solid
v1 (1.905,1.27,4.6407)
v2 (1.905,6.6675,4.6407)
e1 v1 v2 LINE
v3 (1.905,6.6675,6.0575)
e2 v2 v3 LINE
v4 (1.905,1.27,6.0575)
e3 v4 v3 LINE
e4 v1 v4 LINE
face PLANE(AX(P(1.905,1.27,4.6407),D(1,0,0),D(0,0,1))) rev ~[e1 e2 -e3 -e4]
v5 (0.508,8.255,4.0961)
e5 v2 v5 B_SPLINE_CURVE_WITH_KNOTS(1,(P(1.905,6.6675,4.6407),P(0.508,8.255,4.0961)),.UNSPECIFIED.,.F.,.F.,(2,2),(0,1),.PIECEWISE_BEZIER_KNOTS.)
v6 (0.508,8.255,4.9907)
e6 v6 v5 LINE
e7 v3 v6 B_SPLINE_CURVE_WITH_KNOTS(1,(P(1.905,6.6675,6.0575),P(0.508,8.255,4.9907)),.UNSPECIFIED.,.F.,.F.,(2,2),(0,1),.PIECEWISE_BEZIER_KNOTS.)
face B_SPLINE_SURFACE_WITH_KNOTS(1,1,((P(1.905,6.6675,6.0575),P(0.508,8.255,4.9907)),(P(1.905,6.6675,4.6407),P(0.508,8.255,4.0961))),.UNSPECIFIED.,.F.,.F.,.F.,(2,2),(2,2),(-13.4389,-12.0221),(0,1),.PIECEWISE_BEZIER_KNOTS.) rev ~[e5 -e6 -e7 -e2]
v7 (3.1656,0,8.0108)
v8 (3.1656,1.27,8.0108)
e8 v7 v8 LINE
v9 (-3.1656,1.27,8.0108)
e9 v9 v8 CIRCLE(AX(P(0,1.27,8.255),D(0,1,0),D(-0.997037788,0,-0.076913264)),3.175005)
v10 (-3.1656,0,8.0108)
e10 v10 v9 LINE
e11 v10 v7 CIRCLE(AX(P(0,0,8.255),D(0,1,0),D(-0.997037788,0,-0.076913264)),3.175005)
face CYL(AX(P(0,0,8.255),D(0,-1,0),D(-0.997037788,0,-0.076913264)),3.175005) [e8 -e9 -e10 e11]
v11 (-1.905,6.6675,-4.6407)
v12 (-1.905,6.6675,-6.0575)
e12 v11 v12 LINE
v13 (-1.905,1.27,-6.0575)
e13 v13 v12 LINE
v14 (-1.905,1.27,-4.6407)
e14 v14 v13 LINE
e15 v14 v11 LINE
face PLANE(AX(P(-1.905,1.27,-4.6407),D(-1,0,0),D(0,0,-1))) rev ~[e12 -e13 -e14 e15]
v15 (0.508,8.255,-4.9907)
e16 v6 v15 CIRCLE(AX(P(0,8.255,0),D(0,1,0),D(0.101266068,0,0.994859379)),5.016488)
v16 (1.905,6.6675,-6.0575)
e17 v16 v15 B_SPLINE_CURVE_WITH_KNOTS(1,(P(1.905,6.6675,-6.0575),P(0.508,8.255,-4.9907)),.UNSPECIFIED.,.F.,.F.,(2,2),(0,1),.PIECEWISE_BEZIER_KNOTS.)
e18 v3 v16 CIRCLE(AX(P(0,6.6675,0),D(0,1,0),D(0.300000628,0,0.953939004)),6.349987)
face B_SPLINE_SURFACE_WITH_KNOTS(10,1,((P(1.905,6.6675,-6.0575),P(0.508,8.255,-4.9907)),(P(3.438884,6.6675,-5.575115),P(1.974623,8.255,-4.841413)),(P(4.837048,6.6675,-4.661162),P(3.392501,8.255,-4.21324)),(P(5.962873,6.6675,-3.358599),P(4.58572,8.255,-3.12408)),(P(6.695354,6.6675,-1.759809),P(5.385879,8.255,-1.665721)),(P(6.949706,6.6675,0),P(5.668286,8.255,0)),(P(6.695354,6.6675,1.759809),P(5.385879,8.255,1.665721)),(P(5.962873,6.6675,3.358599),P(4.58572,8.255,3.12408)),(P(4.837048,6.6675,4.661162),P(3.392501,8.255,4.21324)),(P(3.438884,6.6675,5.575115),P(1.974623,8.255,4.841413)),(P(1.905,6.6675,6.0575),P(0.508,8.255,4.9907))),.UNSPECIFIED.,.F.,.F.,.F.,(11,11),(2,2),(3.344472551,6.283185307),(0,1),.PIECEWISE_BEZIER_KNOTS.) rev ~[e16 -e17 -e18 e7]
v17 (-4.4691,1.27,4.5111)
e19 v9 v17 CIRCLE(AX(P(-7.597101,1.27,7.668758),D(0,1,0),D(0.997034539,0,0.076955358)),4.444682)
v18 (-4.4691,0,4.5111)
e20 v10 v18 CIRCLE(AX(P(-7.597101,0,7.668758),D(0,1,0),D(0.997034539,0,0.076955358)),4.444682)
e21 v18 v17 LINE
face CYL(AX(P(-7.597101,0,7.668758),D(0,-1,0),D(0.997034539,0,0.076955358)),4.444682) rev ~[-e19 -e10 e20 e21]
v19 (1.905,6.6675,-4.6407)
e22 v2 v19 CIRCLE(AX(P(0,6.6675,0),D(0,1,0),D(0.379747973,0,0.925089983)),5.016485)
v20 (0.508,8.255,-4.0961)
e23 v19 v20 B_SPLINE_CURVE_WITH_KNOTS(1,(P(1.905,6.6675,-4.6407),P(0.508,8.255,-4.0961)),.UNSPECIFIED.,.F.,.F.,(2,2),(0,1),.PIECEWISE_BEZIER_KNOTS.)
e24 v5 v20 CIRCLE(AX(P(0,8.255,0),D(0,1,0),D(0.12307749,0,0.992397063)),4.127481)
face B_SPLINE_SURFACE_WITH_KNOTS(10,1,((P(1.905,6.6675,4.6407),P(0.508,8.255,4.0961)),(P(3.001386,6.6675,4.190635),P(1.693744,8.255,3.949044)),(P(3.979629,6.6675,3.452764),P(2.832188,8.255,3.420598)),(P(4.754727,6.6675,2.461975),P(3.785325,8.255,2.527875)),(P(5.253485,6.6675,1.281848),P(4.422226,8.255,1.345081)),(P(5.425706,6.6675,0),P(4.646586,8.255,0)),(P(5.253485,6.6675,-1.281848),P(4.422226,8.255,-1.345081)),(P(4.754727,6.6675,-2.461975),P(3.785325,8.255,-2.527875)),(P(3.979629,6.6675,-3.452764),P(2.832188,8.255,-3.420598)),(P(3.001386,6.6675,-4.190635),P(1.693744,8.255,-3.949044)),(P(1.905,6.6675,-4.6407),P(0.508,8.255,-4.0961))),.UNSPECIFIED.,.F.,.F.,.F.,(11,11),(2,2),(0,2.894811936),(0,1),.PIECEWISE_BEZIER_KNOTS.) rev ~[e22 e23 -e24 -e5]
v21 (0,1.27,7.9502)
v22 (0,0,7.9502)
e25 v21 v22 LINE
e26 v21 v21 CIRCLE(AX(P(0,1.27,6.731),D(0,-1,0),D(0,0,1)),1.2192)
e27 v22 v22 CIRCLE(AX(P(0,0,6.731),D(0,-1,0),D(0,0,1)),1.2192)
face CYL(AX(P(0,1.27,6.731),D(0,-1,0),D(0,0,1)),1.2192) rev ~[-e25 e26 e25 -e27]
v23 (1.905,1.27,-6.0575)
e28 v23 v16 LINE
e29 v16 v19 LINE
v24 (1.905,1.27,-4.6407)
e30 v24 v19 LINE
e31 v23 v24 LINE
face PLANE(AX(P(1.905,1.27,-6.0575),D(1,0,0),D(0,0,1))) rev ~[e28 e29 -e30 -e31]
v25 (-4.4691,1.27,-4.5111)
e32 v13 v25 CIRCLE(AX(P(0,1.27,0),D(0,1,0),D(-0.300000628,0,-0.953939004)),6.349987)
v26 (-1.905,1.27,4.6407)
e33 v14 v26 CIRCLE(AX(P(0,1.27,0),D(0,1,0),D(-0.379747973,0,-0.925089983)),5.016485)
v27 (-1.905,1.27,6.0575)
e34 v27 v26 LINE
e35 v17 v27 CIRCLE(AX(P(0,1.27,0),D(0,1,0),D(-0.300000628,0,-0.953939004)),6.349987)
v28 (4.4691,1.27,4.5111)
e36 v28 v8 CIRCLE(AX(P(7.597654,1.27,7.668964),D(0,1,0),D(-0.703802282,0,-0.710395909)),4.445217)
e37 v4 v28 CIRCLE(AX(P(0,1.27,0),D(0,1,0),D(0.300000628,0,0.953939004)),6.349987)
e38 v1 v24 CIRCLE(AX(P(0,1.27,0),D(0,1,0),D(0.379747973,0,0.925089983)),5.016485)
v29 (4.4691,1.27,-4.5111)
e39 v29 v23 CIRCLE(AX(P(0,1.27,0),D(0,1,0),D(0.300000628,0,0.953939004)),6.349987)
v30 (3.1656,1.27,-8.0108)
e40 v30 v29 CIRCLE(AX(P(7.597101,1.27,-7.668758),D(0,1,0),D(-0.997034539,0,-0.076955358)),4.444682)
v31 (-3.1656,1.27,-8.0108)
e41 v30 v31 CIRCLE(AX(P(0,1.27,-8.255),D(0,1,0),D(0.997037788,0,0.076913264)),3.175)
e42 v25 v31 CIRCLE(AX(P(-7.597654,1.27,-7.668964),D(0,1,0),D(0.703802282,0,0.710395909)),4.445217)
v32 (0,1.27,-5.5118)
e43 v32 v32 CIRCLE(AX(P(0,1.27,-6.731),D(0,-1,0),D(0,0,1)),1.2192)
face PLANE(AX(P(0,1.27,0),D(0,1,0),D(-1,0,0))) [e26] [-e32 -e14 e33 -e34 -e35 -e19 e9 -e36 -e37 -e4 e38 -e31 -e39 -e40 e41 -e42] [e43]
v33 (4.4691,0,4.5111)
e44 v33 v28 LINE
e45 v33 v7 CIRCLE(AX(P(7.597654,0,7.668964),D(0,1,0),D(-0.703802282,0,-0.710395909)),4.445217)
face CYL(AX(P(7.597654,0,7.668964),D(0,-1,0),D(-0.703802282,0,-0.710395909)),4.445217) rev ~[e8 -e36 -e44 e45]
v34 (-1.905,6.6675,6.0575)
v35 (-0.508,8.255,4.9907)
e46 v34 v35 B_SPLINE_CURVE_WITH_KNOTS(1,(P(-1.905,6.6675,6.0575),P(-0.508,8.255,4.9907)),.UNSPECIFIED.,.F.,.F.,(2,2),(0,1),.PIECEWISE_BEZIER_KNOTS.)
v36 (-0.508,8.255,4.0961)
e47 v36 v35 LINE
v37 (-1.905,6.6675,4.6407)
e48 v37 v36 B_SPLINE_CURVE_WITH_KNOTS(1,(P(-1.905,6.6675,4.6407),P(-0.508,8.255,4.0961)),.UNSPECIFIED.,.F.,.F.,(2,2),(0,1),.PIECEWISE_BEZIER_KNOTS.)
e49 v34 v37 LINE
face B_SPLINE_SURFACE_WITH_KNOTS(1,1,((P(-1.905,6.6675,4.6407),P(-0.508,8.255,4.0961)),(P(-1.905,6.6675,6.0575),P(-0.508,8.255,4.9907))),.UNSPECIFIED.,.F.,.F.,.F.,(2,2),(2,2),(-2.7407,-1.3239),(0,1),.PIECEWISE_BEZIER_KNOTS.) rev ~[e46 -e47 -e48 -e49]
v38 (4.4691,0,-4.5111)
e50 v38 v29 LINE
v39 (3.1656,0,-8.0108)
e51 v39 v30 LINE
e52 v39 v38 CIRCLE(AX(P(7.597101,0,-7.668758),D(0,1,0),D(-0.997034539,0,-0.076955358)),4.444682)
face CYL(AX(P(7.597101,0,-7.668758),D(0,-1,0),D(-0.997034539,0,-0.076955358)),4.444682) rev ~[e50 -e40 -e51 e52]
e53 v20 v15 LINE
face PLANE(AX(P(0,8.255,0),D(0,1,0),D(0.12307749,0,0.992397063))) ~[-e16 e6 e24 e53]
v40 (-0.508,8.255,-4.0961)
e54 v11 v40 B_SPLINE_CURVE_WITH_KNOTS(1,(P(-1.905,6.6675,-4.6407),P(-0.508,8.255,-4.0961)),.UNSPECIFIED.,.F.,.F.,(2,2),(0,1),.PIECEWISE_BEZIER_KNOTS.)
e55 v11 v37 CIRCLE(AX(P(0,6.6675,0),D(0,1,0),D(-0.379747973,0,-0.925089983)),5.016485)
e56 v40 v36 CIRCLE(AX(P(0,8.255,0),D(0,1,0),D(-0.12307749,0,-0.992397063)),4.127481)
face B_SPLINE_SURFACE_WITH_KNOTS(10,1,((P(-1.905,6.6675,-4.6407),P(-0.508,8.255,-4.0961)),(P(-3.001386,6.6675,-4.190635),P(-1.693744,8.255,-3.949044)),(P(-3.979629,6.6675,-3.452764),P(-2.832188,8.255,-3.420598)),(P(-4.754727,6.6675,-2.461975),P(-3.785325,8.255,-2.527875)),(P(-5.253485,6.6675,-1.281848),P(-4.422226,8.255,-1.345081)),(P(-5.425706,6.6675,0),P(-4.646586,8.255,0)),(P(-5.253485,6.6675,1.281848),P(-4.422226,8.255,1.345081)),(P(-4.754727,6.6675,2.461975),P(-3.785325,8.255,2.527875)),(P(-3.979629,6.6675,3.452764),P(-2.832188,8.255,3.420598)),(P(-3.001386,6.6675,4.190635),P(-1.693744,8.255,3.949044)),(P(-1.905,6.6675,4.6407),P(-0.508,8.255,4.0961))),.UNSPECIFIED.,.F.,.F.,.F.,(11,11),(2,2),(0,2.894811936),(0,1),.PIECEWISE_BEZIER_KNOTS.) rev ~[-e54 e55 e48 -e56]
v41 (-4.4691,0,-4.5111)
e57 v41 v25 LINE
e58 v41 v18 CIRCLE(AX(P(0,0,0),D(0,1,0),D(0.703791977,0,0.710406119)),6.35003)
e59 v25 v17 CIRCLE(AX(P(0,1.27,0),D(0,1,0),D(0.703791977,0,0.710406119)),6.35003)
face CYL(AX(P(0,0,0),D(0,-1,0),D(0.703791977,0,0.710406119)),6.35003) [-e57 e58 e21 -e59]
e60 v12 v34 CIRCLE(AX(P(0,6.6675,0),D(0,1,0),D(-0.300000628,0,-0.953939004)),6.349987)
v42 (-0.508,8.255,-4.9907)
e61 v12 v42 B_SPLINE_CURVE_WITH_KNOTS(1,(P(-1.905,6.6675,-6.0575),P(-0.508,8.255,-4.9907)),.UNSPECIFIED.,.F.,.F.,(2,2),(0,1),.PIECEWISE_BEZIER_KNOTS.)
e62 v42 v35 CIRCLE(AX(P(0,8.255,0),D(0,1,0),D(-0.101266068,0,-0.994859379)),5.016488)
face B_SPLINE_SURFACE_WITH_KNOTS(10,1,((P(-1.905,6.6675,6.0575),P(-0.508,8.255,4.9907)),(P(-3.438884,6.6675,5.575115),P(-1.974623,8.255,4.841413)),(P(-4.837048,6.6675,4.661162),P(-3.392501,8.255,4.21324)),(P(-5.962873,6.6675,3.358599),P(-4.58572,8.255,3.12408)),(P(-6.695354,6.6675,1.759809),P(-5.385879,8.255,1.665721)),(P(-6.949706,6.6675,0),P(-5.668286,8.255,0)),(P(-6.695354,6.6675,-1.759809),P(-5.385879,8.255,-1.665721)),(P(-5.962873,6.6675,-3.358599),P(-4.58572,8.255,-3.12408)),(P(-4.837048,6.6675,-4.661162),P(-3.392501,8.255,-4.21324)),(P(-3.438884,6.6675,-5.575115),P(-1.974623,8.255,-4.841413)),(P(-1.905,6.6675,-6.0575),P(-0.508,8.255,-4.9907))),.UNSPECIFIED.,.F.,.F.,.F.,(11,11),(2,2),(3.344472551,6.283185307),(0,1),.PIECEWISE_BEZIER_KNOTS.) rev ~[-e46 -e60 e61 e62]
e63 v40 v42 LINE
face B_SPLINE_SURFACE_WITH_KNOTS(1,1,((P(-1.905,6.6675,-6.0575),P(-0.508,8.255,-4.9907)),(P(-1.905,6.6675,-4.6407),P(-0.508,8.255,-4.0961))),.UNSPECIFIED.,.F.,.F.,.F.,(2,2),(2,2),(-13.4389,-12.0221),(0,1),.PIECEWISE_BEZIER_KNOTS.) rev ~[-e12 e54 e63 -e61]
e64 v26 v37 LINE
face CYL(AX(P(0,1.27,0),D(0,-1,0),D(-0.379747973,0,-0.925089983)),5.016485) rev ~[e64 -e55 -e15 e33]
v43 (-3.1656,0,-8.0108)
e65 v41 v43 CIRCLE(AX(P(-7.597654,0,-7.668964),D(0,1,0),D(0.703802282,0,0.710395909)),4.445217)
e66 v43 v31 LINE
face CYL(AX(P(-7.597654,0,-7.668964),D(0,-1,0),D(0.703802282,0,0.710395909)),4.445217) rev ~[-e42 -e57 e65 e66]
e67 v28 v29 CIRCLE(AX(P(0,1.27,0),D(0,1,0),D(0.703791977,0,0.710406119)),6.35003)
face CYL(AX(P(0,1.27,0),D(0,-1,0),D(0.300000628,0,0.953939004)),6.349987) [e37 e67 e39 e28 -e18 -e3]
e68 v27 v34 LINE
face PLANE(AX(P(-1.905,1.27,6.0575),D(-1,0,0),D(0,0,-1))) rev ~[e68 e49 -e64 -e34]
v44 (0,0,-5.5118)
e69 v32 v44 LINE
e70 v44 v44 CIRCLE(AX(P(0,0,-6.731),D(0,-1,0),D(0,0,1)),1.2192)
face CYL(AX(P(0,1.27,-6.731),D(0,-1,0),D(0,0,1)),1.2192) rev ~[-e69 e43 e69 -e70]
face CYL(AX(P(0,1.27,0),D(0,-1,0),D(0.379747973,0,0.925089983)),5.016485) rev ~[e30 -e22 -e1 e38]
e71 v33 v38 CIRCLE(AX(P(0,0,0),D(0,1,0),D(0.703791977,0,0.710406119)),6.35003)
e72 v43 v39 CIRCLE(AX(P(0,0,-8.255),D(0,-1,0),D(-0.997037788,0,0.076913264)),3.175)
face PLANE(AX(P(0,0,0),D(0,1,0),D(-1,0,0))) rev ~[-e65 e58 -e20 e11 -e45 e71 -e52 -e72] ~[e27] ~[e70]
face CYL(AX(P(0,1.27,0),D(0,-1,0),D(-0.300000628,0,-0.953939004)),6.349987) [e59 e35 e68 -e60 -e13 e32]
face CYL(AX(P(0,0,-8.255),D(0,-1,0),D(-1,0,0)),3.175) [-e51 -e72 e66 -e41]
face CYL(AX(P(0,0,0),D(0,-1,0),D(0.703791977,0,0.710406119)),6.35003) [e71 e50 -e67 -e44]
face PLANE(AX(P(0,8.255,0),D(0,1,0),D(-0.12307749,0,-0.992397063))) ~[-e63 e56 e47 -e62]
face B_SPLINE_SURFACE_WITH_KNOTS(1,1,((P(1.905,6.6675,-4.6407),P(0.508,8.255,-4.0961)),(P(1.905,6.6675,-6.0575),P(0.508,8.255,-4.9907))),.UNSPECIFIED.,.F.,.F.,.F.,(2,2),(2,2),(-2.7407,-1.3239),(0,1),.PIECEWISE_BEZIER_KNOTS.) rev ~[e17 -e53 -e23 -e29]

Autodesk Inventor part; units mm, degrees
ref_plane "YZ Plane" through (0, 0, 0) normal (1, 0, 0) x (0, 1, 0)
ref_plane "XZ Plane" through (0, 0, 0) normal (0, 1, 0) x (-1, 0, 0)
sketch "Sketch1" plane through (0, 0, 0) normal (0, 1, 0) x (-1, 0, 0)
  arc A0 (-4.4691, 4.5111) -> (4.4691, 4.5111) centre (0, 0) ccw
  arc A1 (3.1656, 8.0108) -> (-3.1656, 8.0108) centre (0, 8.255) ccw
  circle A2 centre (0, -8.255) radius 3.175
  line L0 (0, 0) -> (3.175, 0)
  arc A3 (3.1656, 8.0108) -> (4.4691, 4.5111) centre (7.5974, 7.6688) ccw
  arc A4 (-4.4691, 4.5111) -> (-3.1656, 8.0108) centre (-7.5974, 7.6688) ccw
  arc A5 (-3.1656, -8.0108) -> (-4.4691, -4.5111) centre (-7.5974, -7.6688) ccw
  arc A6 (4.4691, -4.5111) -> (3.1656, -8.0108) centre (7.5974, -7.6688) ccw
  dimension "d0" = 12.7
  dimension "d2" = 6.35
  dimension "d4" = 6.35
  dimension "d5" = 8.89
  dimension "d6" = 16.51
extrude "Extrusion1" add sketch "Sketch1" along normal blind 1.27
sketch "Sketch2" plane through (0, 1.27, 0) normal (0, 1, 0) x (1, 0, 0)
  line L0 (1.905, -7.3814) -> (-1.905, -7.3814)
  line L1 (-1.905, -7.3814) -> (-1.905, 7.3814)
  line L2 (-1.905, 7.3814) -> (1.905, 7.3814)
  line L3 (1.905, 7.3814) -> (1.905, -7.3814)
  line L4 (1.905, -7.3814) -> (-1.905, 7.3814) construction
  line L5 (-1.905, -7.3814) -> (1.905, 7.3814) construction
  arc A0 (1.905, -4.6407) -> (1.905, 4.6407) centre (0, 0) ccw
  arc A1 (-1.905, 4.6407) -> (-1.905, -4.6407) centre (0, 0) ccw
  arc A2 (1.905, -6.0575) -> (1.905, 6.0575) centre (0, 0) ccw
  arc A3 (-1.905, 6.0575) -> (-1.905, -6.0575) centre (0, 0) ccw
  dimension "d11" = 3.81
  dimension "d34" = 5.0165
  dimension "d35" = 6.35
  dimension "d36" = 5.0165
  dimension "d37" = 6.35
extrude "Extrusion2" add sketch "Sketch2" along normal blind 5.3975 contours L3 A0 A2 | A3 L1 A1
sketch "Sketch3" plane through (0, 6.6675, 0) normal (0, 1, 0) x (1, 0, 0)
  arc A0 (-1.905, 4.6407) -> (-1.905, -4.6407) centre (0, 0) ccw projected
  line L0 (-1.905, 4.6407) -> (-1.905, 6.0575) projected
  arc A1 (-1.905, 6.0575) -> (-1.905, -6.0575) centre (0, 0) ccw projected
  line L1 (-1.905, -6.0575) -> (-1.905, -4.6407) projected
  line L2 (1.905, -4.6407) -> (1.905, -6.0575) projected
  arc A2 (1.905, -6.0575) -> (1.905, 6.0575) centre (0, 0) ccw projected
  line L3 (1.905, 6.0575) -> (1.905, 4.6407) projected
  arc A3 (1.905, -4.6407) -> (1.905, 4.6407) centre (0, 0) ccw projected
ref_plane "Work Plane1" through (0, 8.255, 0) normal (0, 1, 0) x (1, 0, 0)
sketch "Sketch4" plane through (0, 8.255, 0) normal (0, 1, 0) x (1, 0, 0)
  arc A0 (0.508, -4.9907) -> (0.508, 4.9907) centre (0, 0) ccw
  arc A1 (0.508, -4.0961) -> (0.508, 4.0961) centre (0, 0) ccw
  line L0 (0.508, -4.9907) -> (0.508, -4.0961)
  line L1 (0.508, 4.0961) -> (0.508, 4.9907)
sketch "Sketch5" plane through (0, 8.255, 0) normal (0, 1, 0) x (1, 0, 0)
  line L0 (-0.508, -4.0961) -> (-0.508, -4.9907) projected
  arc A0 (-0.508, 4.0961) -> (-0.508, -4.0961) centre (0, 0) ccw projected
  arc A1 (-0.508, 4.9907) -> (-0.508, -4.9907) centre (0, 0) ccw projected
  line L1 (-0.508, 4.0961) -> (-0.508, 4.9907)
loft "Loft1" add profiles "Sketch4" section 1 edges at (1.905, 6.6675, 5.3491) (6.35, 6.6675, 0) (1.905, 6.6675, -5.3491) (5.0165, 6.6675, 0)
loft "Loft2" add profiles "Sketch5" section 1 edges at (-5.0165, 6.6675, 0) (-1.905, 6.6675, -5.3491) (-6.35, 6.6675, 0) (-1.905, 6.6675, 5.3491)
sketch "Sketch6" plane through (0, 1.27, 0) normal (0, 1, 0) x (1, 0, 0)
  line L0 (0, 0) -> (-3.0006, 0)
  point P0 (0, -6.731)
  point P1 (0, 6.731)
  dimension "d26" = 13.462
hole "Hole1" at (0, 1.27, 6.731) at (0, 1.27, -6.731) direction (0, -1, 0) diameter 2.4384 end through all clearance for "Flat Head Machine Screw (82)" size "#2" standard "Ansi Unified Screw Threads"
properties part number "CasterEnclosure" material "ABS Plastic"
